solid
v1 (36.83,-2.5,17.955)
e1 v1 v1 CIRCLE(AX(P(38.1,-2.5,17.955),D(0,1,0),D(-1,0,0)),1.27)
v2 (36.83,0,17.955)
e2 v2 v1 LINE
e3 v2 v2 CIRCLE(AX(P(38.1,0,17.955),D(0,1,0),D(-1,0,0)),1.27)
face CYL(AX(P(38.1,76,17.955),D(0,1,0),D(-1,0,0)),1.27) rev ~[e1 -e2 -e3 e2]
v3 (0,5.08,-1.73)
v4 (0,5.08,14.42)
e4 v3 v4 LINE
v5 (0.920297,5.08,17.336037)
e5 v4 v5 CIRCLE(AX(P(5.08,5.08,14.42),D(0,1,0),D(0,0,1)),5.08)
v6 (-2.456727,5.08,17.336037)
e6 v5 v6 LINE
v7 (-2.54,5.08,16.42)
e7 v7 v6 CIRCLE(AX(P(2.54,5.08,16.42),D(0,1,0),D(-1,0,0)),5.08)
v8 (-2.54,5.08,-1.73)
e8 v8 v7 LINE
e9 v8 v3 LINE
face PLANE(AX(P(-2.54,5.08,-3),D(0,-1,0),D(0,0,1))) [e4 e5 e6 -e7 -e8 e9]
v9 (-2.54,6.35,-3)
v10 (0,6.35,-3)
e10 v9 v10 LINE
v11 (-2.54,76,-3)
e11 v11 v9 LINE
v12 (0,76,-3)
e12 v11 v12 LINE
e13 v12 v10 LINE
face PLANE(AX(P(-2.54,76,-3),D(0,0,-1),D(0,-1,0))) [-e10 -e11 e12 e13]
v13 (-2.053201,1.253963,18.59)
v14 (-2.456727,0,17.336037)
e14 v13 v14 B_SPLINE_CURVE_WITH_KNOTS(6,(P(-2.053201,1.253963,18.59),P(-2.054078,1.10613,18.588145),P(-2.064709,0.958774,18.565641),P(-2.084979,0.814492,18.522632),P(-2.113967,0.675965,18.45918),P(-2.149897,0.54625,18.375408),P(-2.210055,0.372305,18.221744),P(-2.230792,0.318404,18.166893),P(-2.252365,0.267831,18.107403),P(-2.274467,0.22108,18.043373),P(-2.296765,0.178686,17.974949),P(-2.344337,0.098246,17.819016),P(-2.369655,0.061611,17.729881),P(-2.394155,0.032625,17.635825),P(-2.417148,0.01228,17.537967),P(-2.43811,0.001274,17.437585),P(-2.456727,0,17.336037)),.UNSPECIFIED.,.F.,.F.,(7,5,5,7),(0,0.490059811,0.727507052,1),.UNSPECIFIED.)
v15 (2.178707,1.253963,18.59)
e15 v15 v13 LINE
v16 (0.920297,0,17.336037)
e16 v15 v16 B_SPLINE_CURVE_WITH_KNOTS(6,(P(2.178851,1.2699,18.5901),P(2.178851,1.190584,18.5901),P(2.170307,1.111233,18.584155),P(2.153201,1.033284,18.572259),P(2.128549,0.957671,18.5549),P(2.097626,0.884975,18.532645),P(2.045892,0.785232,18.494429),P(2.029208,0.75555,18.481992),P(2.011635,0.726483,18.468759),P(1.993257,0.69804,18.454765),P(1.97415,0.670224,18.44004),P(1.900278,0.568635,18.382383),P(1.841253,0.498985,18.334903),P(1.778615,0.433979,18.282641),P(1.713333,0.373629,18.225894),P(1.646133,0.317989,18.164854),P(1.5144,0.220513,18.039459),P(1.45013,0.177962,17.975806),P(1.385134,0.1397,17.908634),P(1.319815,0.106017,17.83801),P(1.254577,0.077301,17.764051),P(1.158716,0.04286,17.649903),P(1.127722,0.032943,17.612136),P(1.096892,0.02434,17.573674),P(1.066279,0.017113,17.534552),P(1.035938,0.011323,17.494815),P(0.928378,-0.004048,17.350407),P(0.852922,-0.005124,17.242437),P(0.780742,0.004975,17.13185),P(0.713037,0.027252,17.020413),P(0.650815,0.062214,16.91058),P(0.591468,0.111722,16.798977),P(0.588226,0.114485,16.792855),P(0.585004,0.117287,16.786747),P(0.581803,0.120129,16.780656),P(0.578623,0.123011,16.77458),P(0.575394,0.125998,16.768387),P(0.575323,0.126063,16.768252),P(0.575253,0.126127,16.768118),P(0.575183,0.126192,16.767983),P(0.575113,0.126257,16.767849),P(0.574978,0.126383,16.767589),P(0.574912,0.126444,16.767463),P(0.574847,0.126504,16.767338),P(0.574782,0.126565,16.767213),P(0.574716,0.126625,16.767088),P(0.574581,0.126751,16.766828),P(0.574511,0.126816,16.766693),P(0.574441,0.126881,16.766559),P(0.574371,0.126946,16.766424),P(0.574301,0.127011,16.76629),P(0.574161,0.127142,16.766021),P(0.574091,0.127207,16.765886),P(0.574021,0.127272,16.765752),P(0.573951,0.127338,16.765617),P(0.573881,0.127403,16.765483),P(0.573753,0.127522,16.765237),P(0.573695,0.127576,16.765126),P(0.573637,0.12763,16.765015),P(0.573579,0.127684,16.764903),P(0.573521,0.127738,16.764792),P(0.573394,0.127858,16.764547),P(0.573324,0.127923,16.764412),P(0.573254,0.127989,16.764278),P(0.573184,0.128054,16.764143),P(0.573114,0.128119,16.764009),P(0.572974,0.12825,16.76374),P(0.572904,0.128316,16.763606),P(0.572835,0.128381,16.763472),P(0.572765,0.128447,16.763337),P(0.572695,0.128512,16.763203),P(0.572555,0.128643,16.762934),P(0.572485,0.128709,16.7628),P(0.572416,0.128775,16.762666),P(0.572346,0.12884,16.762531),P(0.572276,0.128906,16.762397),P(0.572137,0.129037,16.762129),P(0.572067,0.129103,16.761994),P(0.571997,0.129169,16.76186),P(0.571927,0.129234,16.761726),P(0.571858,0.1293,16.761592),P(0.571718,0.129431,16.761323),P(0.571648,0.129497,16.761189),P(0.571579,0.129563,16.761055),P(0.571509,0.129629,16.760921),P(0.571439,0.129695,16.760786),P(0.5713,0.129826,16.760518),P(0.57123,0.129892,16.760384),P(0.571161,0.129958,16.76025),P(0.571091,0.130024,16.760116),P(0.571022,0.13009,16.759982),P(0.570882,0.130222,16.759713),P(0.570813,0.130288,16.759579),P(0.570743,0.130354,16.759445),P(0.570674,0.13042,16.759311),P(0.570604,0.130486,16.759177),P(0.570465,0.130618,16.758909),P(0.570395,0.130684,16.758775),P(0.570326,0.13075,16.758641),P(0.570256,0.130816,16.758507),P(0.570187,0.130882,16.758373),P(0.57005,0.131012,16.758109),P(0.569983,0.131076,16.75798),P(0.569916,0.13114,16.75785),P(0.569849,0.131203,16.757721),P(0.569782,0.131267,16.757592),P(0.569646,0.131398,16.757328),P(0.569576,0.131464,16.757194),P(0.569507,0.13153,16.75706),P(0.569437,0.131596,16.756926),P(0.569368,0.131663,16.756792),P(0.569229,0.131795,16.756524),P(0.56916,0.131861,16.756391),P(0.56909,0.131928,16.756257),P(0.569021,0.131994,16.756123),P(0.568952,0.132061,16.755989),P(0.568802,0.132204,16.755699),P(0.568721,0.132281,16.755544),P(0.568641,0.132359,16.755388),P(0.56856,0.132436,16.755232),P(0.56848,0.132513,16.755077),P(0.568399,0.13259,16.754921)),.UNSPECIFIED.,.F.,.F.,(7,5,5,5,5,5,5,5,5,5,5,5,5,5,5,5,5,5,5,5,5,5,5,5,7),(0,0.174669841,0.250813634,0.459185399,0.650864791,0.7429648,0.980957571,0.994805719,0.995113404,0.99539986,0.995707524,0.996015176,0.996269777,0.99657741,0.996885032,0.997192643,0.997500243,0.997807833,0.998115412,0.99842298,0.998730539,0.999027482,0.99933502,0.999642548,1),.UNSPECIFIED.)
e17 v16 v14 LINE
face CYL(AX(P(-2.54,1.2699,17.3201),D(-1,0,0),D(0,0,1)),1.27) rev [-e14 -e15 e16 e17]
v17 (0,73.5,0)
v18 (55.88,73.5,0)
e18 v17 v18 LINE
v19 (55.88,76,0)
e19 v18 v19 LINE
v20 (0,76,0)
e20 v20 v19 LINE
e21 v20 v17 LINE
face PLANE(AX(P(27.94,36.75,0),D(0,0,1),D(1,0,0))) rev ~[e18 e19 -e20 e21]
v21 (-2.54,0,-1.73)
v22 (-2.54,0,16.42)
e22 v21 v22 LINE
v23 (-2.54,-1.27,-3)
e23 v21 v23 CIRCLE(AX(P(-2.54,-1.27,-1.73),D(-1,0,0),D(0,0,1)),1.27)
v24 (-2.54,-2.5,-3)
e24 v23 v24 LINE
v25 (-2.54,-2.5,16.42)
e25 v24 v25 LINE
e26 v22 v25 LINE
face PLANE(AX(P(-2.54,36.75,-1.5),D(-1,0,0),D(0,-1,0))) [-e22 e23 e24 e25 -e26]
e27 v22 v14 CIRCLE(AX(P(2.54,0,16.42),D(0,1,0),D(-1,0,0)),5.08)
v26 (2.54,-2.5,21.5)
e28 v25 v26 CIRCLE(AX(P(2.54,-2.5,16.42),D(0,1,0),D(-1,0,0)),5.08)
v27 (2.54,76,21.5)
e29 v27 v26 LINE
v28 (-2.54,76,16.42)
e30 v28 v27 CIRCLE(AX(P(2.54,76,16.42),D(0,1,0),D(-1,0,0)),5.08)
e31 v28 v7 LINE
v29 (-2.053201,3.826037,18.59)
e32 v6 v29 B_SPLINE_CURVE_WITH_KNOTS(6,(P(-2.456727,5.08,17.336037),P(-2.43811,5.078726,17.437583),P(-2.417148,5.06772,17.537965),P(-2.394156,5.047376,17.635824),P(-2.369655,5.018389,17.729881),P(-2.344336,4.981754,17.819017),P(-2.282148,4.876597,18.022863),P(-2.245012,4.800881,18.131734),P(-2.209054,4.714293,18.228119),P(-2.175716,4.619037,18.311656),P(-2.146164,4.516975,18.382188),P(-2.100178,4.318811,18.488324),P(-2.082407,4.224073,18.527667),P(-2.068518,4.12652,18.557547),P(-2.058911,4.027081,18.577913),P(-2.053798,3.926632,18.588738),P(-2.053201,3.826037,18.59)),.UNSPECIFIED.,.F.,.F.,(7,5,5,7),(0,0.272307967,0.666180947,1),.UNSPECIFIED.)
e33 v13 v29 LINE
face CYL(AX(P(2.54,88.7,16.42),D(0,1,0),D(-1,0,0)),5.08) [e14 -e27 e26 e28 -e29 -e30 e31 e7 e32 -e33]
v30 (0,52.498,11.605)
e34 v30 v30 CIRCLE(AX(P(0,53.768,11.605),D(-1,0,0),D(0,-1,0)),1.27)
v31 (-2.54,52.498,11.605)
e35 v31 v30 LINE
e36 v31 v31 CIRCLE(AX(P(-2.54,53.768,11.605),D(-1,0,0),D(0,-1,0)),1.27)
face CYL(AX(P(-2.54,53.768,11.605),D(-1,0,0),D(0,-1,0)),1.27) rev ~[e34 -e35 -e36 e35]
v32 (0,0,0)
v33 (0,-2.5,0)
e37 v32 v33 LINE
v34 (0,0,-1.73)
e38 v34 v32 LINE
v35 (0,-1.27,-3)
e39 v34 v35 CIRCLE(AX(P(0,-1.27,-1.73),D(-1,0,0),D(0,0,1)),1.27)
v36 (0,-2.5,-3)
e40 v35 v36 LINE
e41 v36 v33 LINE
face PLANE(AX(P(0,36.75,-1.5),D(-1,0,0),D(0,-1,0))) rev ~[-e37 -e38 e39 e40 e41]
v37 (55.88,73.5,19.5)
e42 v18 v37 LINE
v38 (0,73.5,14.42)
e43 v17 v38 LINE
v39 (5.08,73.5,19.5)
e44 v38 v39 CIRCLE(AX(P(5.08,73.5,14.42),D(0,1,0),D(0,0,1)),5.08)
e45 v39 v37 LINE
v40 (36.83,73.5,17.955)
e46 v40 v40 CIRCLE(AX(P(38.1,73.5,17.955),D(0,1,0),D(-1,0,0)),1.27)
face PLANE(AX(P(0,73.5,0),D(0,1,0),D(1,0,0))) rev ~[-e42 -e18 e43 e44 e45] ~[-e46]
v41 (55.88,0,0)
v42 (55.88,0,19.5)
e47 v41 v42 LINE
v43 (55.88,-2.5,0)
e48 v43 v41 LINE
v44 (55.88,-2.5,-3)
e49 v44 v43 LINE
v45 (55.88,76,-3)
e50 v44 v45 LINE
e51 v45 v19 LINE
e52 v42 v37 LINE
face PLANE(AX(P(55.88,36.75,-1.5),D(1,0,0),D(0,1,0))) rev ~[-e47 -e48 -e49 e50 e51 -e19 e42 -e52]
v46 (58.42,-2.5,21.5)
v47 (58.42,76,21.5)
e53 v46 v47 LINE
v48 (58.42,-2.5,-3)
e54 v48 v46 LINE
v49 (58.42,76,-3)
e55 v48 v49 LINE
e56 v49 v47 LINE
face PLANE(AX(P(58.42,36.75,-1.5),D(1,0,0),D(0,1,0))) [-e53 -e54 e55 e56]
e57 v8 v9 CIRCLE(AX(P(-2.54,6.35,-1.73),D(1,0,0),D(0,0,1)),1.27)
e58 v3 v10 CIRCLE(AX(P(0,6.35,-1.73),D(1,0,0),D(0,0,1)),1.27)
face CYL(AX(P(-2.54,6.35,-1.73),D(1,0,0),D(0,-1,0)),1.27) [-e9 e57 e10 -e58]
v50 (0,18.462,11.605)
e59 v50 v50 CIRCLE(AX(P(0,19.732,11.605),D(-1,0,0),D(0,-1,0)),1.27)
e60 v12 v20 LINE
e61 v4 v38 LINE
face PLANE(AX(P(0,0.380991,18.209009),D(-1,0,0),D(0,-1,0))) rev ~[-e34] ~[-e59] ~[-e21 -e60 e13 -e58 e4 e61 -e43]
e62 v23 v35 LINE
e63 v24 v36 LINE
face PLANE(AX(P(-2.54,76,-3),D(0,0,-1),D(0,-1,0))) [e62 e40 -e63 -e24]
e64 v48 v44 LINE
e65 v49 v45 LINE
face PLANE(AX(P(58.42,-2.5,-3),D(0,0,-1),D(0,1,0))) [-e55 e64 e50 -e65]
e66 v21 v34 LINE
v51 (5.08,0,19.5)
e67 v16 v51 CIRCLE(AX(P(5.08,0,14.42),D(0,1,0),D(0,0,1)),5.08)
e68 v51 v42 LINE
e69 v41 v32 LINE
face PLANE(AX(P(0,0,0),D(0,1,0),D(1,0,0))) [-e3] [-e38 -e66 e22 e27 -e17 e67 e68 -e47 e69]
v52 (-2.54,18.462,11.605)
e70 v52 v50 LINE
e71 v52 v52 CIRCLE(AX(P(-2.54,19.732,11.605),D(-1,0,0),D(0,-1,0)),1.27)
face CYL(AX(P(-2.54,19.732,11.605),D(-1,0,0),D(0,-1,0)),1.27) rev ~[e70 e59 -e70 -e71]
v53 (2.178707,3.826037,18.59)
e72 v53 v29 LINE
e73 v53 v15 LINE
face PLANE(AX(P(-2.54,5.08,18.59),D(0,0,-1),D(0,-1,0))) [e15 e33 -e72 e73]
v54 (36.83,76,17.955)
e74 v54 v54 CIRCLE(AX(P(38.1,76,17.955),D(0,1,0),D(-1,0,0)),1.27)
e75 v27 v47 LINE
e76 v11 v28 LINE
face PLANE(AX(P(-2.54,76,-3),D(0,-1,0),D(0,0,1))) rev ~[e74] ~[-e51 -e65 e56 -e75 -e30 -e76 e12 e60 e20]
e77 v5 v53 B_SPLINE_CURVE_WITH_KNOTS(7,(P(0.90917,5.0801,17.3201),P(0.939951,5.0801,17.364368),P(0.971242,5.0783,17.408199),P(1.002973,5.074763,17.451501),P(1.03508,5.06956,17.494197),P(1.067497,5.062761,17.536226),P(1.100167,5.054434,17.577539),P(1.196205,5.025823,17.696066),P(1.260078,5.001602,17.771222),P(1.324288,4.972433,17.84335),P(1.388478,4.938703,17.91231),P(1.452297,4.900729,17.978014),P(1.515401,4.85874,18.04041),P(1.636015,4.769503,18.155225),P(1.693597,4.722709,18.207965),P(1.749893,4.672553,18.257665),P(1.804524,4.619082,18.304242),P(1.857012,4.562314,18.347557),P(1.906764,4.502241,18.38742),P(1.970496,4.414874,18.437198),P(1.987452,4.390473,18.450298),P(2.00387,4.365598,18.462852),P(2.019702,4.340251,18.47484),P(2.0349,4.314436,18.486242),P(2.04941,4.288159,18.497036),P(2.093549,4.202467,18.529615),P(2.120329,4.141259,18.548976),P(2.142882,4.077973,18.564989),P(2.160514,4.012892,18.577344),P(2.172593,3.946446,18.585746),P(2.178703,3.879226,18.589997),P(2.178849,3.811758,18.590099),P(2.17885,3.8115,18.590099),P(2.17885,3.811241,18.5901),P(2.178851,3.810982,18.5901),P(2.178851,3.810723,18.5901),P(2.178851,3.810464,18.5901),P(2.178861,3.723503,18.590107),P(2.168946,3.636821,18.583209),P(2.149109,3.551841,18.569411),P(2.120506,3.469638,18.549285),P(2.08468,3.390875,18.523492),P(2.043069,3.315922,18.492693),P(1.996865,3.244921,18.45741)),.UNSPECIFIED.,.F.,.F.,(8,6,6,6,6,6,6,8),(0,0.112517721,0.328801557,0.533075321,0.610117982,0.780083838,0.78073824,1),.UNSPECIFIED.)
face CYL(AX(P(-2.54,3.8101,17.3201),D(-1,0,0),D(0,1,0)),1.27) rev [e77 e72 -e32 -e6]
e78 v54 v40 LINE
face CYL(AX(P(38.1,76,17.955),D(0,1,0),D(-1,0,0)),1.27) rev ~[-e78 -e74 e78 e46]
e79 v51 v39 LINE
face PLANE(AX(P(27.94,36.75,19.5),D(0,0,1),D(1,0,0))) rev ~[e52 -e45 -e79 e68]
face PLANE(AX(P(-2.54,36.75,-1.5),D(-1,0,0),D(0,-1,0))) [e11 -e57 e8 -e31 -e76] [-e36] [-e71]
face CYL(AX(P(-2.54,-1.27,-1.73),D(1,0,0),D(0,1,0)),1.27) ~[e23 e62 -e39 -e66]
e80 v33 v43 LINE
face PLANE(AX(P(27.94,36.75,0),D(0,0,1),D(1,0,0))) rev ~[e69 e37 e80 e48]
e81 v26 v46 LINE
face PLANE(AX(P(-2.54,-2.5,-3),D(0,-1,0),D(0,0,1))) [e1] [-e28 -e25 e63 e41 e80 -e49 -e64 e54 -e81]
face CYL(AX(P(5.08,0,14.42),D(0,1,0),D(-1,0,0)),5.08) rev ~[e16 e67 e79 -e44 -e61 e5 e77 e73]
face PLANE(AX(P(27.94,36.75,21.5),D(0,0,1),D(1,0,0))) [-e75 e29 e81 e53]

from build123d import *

# Parameters (mm, degrees)
F1_W         = 60.96
F1_H         = 78.5
F2_DEPTH     = 21.5
F0_W         = 55.88
F0_H         = 73.5
F3_DEPTH     = 19.5
F4_W         = 78.5
F4_H         = 3
F5_DEPTH     = 2.54
F6_W         = 78.5
F6_H         = 3
F7_DEPTH     = 2.54
F8_W         = 44.0962035209
F8_H         = 7.4383728206
F9_DEPTH     = 2.5
F10_W        = 5.08
F10_H        = 21.59
F11_DEPTH    = 25.4
F12_R        = 1.27
F13_R        = 1.27
F14_DEPTH    = 101.6
F15_R        = 1.27
F16_DEPTH    = 25.4
F17_T1_DEPTH = 2.54
F18_F1_R     = 5.08
F18_T2_DEPTH = 103.9


# Not quite as in the source:
# - a fillet or chamfer that OpenCascade refuses, or shapes differently, is made with other operations: its cross-section is extruded or revolved along the edge and cut away or added


with BuildPart() as f2:
    # F1 (on Top) → F2 (new body)
    with BuildSketch(Plane.XY):
        with Locations((27.94, 36.75)):
            Rectangle(F1_W, F1_H)
    extrude(amount=F2_DEPTH)

    # F0 (on Top) → F3 (cut)
    with BuildSketch(Plane.XY):
        with Locations((27.94, 36.75)):
            Rectangle(F0_W, F0_H)
    extrude(amount=F3_DEPTH, mode=Mode.SUBTRACT)

    # F4 (on face) → F5 (join, through all)
    with BuildSketch(Plane.YZ.offset(58.42)):
        with Locations((36.75, -1.5)):
            Rectangle(F4_W, F4_H)
    extrude(amount=-F5_DEPTH)

    # F6 (on face) → F7 (join, through all)
    with BuildSketch(Plane(origin=(-2.54, 0, 0), x_dir=(0, -1, 0), z_dir=(-1, 0, 0))):
        with Locations((-36.75, -1.5)):
            Rectangle(F6_W, F6_H)
    extrude(amount=-F7_DEPTH)

    # F8 (on face) → F9 (join, through all)
    with BuildSketch(Plane.XZ.offset(2.5)):
        with Locations((27.1060718223, 8.4709739313)):
            Rectangle(F8_W, F8_H)
    extrude(amount=-F9_DEPTH)

    # F10 (on face) → F11 (cut)
    with BuildSketch(Plane(origin=(-2.54, 0, 0), x_dir=(0, -1, 0), z_dir=(-1, 0, 0))):
        with Locations((-2.54, 7.795)):
            Rectangle(F10_W, F10_H)
    extrude(amount=-F11_DEPTH, mode=Mode.SUBTRACT)

    # F12
    f12_edges = [f2.edges().sort_by_distance(p)[0] for p in [
        (-1.27, 0, -3),
        (-1.27, 5.08, -3),
    ]]
    fillet(f12_edges, radius=F12_R)

    # F13 (on face) → F14 (cut)
    with BuildSketch(Plane(origin=(0, 76, 0), x_dir=(-1, 0, 0), z_dir=(0, 1, 0))):
        with Locations((-38.1, 17.955)):
            Circle(F13_R)
    extrude(amount=-F14_DEPTH, mode=Mode.SUBTRACT)

    # F15 (on face) → F16 (cut)
    with BuildSketch(Plane(origin=(-2.54, 0, 0), x_dir=(0, -1, 0), z_dir=(-1, 0, 0))):
        with Locations((-53.768, 11.605)):
            Circle(F15_R)
        with Locations((-19.732, 11.605)):
            Circle(F15_R)
    extrude(amount=-F16_DEPTH, mode=Mode.SUBTRACT)

    # F17: fillet of radius 1.27 on 2 edges, made by hand

    # F17_s2 → F17_t1 (join)
    with BuildSketch(Plane.YZ.offset(-2.54)):
        with BuildLine():
            ThreePointArc((1.2699, 18.5901), (0.3718743879, 18.2181256121), (-0.0001, 17.3201))
            Line((-0.0001, 17.3201), (-0.0255, 17.3201))
            ThreePointArc((-0.0255, 17.3201), (-0.0254, 17.95505), (-0.0254, 18.59))
            Line((-0.0254, 18.59), (0, 18.6154))
            ThreePointArc((0, 18.6154), (0.63495, 18.6154), (1.2699, 18.6155))
            Line((1.2699, 18.6155), (1.2699, 18.5901))
        make_face()
        with BuildLine():
            ThreePointArc((5.0801, 17.3201), (4.7081256121, 18.2181256121), (3.8101, 18.5901))
            Line((3.8101, 18.5901), (3.8101, 18.6155))
            ThreePointArc((3.8101, 18.6155), (4.44505, 18.6154), (5.08, 18.6154))
            Line((5.08, 18.6154), (5.1054, 18.59))
            ThreePointArc((5.1054, 18.59), (5.1054, 17.95505), (5.1055, 17.3201))
            Line((5.1055, 17.3201), (5.0801, 17.3201))
        make_face()
    extrude(amount=F17_T1_DEPTH)

    # F18: fillet of radius 5.08 on 2 edges, made by hand

    # F18_f1
    f18_f1_edges = [f2.edges().sort_by_distance(p)[0] for p in [
        (0, 36.75, 19.5),
    ]]
    fillet(f18_f1_edges, radius=F18_F1_R)

    # F18_s3 → F18_t2 (cut)
    with BuildSketch(Plane.XZ.offset(-88.7)):
        with BuildLine():
            ThreePointArc((-2.54, 16.42), (-1.0521024484, 20.0121024484), (2.54, 21.5))
            Line((2.54, 21.5), (2.54, 21.6016))
            Line((2.54, 21.6016), (-2.6416, 21.6016))
            Line((-2.6416, 21.6016), (-2.6416, 16.42))
            Line((-2.6416, 16.42), (-2.54, 16.42))
        make_face()
    extrude(amount=F18_T2_DEPTH, mode=Mode.SUBTRACT)


solid = f2.part
